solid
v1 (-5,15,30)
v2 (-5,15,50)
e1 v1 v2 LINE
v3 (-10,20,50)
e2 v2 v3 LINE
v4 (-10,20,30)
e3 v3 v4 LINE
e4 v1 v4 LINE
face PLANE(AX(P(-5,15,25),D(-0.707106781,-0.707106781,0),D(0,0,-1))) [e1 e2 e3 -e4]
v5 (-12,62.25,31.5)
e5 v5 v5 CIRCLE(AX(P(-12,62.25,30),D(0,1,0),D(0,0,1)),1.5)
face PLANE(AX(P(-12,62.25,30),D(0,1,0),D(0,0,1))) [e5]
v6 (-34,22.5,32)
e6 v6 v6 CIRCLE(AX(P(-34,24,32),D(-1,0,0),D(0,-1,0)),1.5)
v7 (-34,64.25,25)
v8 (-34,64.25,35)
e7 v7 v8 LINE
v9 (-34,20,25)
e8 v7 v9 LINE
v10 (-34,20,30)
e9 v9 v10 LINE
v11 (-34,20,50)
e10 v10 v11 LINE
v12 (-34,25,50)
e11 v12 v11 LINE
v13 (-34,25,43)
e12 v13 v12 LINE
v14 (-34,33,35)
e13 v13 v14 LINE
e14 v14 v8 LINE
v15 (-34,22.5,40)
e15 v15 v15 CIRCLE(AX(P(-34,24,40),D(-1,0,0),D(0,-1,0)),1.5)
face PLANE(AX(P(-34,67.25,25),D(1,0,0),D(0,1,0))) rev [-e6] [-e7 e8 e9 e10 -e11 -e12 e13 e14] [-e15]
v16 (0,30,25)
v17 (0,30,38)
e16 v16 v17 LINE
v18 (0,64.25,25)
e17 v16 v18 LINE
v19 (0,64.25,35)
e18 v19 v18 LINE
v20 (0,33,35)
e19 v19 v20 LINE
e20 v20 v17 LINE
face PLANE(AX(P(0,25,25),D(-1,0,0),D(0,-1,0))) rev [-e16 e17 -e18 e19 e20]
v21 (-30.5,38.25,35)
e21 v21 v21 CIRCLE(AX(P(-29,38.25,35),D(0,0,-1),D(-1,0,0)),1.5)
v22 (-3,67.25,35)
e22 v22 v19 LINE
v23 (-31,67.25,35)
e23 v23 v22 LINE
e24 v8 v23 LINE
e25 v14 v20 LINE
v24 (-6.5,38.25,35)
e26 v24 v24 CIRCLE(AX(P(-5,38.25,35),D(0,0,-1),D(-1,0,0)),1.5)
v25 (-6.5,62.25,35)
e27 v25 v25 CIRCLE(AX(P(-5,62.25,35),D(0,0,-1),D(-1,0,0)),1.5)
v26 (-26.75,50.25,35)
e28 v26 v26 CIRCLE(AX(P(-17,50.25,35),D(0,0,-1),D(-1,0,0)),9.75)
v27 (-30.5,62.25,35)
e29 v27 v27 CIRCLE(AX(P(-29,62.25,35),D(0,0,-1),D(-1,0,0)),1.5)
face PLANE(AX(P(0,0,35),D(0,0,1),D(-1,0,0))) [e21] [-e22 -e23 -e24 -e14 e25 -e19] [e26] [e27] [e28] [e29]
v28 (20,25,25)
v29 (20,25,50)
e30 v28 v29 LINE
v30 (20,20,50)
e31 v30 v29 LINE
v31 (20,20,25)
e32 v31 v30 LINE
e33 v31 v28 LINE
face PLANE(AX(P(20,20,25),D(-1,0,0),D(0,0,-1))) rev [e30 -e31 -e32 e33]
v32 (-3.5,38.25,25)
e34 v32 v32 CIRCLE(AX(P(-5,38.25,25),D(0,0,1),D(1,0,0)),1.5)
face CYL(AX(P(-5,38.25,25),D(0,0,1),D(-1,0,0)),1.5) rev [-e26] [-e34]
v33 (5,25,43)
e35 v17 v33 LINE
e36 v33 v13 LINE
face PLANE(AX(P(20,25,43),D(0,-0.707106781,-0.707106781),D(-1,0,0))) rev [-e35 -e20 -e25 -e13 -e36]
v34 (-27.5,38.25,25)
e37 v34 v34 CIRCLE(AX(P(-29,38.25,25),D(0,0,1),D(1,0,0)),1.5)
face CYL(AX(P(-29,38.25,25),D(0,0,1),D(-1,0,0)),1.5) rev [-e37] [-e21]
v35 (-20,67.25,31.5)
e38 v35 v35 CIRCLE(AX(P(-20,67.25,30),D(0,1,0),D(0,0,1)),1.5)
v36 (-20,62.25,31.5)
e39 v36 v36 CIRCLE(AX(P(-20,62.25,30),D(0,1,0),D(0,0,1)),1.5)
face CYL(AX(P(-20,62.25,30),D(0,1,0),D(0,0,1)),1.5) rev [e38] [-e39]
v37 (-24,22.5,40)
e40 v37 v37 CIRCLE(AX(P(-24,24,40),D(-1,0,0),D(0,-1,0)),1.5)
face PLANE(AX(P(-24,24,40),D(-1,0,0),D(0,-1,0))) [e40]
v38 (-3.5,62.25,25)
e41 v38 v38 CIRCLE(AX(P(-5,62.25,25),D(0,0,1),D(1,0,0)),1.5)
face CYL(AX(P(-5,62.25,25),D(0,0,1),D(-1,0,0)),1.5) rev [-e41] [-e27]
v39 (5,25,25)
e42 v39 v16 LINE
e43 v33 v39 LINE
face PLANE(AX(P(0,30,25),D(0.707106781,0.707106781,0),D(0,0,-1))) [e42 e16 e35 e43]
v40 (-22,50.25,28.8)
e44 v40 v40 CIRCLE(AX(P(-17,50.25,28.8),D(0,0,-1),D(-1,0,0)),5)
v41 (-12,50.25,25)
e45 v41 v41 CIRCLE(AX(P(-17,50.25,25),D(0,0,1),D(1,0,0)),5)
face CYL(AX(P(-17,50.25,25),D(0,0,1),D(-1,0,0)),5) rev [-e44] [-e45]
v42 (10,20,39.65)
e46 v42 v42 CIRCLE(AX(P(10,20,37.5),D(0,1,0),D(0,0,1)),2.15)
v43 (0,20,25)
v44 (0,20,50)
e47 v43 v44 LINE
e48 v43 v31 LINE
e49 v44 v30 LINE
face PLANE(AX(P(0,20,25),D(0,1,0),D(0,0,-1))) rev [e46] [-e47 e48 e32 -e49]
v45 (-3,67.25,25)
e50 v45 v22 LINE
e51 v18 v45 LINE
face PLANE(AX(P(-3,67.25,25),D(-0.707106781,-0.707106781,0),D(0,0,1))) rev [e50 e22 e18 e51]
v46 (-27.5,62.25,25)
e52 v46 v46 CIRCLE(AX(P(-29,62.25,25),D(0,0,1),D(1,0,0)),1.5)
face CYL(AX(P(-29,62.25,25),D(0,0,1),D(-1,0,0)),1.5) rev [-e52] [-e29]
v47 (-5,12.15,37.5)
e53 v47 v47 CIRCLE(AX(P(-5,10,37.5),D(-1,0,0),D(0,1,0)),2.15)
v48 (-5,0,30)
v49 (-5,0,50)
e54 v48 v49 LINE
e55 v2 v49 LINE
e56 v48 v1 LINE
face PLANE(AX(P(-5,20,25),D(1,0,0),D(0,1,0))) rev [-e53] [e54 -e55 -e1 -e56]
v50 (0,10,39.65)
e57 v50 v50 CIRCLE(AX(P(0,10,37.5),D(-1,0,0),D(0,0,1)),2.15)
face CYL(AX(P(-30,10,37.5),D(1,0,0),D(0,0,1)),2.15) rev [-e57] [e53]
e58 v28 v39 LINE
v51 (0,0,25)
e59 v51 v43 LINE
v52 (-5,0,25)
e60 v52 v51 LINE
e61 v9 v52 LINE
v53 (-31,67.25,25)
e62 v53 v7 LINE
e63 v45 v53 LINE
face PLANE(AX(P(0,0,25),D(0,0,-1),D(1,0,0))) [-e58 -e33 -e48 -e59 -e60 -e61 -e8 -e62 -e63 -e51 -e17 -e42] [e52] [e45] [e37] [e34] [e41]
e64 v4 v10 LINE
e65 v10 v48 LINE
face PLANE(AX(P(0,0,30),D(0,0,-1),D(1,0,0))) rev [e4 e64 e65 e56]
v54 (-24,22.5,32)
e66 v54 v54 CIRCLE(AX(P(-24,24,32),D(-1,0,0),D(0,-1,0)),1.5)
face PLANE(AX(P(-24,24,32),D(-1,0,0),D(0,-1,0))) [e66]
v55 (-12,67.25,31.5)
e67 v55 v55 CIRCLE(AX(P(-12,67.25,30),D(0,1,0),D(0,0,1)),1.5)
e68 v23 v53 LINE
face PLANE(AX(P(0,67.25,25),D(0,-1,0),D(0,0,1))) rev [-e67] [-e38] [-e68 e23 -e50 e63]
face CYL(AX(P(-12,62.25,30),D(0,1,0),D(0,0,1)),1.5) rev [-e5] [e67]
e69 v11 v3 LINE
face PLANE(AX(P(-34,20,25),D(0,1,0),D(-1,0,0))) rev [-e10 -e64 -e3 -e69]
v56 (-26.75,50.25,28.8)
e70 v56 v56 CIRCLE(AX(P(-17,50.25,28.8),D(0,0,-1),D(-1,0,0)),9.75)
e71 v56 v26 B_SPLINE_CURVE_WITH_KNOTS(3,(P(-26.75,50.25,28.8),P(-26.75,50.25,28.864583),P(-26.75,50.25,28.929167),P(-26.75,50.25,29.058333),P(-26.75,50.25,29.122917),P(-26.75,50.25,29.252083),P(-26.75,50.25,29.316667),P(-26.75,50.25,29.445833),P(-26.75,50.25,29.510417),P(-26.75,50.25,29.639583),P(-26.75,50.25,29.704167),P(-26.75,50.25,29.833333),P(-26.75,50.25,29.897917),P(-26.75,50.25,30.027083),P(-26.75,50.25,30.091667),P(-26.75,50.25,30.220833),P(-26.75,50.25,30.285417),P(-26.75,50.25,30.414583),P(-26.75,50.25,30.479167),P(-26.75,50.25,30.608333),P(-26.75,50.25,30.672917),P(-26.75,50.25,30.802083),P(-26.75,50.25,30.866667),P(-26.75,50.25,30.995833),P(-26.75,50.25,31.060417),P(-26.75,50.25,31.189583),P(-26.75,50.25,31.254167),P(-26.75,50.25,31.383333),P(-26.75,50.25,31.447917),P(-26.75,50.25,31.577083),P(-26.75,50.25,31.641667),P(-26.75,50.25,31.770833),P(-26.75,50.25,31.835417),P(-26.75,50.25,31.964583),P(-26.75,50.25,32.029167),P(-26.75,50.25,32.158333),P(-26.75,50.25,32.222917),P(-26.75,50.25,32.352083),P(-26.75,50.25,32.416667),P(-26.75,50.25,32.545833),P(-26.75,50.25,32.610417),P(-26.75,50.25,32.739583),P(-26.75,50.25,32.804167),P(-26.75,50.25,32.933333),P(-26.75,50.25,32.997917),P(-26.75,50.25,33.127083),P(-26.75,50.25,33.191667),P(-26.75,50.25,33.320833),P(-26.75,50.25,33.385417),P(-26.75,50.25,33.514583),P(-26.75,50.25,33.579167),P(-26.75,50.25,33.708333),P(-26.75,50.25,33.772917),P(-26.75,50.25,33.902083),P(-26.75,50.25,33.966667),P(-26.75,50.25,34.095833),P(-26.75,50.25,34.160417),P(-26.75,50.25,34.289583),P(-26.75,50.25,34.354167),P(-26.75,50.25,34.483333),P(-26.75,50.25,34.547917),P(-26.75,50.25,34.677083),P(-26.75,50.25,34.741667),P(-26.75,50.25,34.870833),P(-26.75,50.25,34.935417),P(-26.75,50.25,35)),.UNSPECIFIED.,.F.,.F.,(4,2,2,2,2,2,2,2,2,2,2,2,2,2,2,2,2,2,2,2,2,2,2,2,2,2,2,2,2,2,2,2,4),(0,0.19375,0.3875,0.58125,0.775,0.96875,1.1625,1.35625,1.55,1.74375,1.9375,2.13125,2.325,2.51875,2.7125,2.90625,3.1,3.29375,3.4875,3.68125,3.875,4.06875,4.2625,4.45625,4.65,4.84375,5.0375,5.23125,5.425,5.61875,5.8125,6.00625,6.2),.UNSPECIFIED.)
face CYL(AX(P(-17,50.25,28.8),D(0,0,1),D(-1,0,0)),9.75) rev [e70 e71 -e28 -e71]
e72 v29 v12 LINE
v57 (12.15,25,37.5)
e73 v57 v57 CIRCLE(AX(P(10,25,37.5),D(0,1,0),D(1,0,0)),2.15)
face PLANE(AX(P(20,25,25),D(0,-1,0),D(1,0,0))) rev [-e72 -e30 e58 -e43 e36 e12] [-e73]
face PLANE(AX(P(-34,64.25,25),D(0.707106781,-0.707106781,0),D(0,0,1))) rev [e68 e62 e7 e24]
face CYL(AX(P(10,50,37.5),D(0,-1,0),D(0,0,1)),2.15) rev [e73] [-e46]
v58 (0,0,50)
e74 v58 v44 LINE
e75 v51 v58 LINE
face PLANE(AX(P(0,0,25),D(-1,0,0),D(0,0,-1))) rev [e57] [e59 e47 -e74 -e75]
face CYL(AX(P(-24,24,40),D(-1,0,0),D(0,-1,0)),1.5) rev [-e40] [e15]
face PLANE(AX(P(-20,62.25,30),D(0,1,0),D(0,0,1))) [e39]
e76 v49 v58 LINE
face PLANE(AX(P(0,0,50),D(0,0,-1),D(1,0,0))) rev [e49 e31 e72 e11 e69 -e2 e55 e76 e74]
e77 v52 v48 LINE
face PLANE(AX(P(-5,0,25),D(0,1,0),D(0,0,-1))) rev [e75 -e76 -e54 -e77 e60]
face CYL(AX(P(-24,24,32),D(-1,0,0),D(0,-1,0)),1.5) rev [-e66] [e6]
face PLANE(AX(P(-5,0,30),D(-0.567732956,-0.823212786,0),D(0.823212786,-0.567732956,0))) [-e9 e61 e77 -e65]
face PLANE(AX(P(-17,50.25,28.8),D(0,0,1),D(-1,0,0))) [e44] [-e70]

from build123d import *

# Parameters (mm, degrees)
SKETCH_1_R          = 5
SKETCH_1_R_2        = 1.5
EXTRUDE_1_DEPTH     = 25
SKETCH_2_R          = 2.15
CUT_EXTRUDE_1_DEPTH = 30
SKETCH_3_R          = 2.15
CUT_EXTRUDE_2_DEPTH = 30
SKETCH_4_W          = 34
SKETCH_4_H          = 42.25
CUT_EXTRUDE_3_DEPTH = 15
CHAMFER_1_SIZE      = 5
CHAMFER_2_SIZE      = 3
SKETCH_6_R          = 9.75
CUT_EXTRUDE_5_DEPTH = 6.2
EXTRUDE_2_DEPTH     = 5
SKETCH_8_W          = 91.561993536
SKETCH_8_H          = 85.949306993
CUT_EXTRUDE_6_DEPTH = 25
CHAMFER_3_SIZE      = 8
SKETCH_9_R          = 1.5
CUT_EXTRUDE_7_DEPTH = 10
SKETCH_10_R         = 1.5
CUT_EXTRUDE_8_DEPTH = 5


with BuildPart() as part:
    # 草图1 → 凸台-拉伸1 (new body)
    with BuildSketch(Plane.XY):
        Polygon((0, 0), (0, 20), (20, 20), (20, 25), (0, 25), (0, 67.25), (-34, 67.25), (-34, 20), (-5, 20), (-5, 0), align=None)
        with Locations((-17, 50.25)):
            Circle(SKETCH_1_R, mode=Mode.SUBTRACT)
        with Locations((-29, 62.25)):
            Circle(SKETCH_1_R_2, mode=Mode.SUBTRACT)
        with Locations((-5, 62.25)):
            Circle(SKETCH_1_R_2, mode=Mode.SUBTRACT)
        with Locations((-29, 38.25)):
            Circle(SKETCH_1_R_2, mode=Mode.SUBTRACT)
        with Locations((-5, 38.25)):
            Circle(SKETCH_1_R_2, mode=Mode.SUBTRACT)
    extrude(amount=EXTRUDE_1_DEPTH)

    # 草图2 → 切除-拉伸1 (cut)
    with BuildSketch(Plane(origin=(0, 0, 0), x_dir=(0, 0, -1), z_dir=(1, 0, 0))):
        with Locations((-12.5, 10)):
            Circle(SKETCH_2_R)
    extrude(amount=-CUT_EXTRUDE_1_DEPTH, mode=Mode.SUBTRACT)

    # 草图3 → 切除-拉伸2 (cut)
    with BuildSketch(Plane.XZ.offset(-20)):
        with Locations(Location((10, 12.5, 0), (0, 0, 270))):
            Circle(SKETCH_3_R)
    extrude(amount=-CUT_EXTRUDE_2_DEPTH, mode=Mode.SUBTRACT)

    # 草图4 → 切除-拉伸3 (cut)
    with BuildSketch(Plane(origin=(0, 0, 0), x_dir=(-1, 0, 0), z_dir=(0, 0, -1))):
        with Locations((17, 46.125)):
            Rectangle(SKETCH_4_W, SKETCH_4_H)
    extrude(amount=-CUT_EXTRUDE_3_DEPTH, mode=Mode.SUBTRACT)

    # 倒角1
    chamfer_1_edges = [part.edges().sort_by_distance(p)[0] for p in [
        (-5, 20, 12.5),
        (0, 25, 20),
    ]]
    chamfer(chamfer_1_edges, length=CHAMFER_1_SIZE)

    # 倒角2
    chamfer_2_edges = [part.edges().sort_by_distance(p)[0] for p in [
        (-34, 67.25, 20),
        (0, 67.25, 20),
    ]]
    chamfer(chamfer_2_edges, length=CHAMFER_2_SIZE)

    # 草图6 → 切除-拉伸5 (cut)
    with BuildSketch(Plane(origin=(0, 0, 15), x_dir=(-1, 0, 0), z_dir=(0, 0, -1))):
        with Locations((17, 50.25)):
            Circle(SKETCH_6_R)
    extrude(amount=-CUT_EXTRUDE_5_DEPTH, mode=Mode.SUBTRACT)

    # 草图7 → 凸台-拉伸2 (add)
    with BuildSketch(Plane.XY.offset(25)):
        Polygon((-34, 20), (-10, 20), (-5, 15), (-5, 0), align=None)
    extrude(amount=-EXTRUDE_2_DEPTH)


with BuildPart() as body_2:
    # 镜向1: mirrored copy
    add(part.part.mirror(Plane.XY.offset(25)))

    # 倒角3
    # the kernel refuses this chamfer: 8 mm, written as the material it adds along each edge
    with BuildSketch(Plane(origin=(-34, 25, 35), x_dir=(0, 0.9996219169112968, -0.027495876610586487), z_dir=(1, 0, 0))) as chamfer_3_piece_1_section:
        Polygon((CHAMFER_3_SIZE * 0.999621916911, CHAMFER_3_SIZE * 0.0274958766106), (-CHAMFER_3_SIZE * 0.0274958766106, CHAMFER_3_SIZE * 0.999621916911), (0, 0), align=None)
    chamfer_3_piece_1 = extrude(amount=59.573463904, mode=Mode.PRIVATE)
    chamfer_3_piece_1 = split(chamfer_3_piece_1, bisect_by=Plane(origin=(0, 27.617876763, 37.64907513), z_dir=(-1, 0, 0)), keep=Keep.TOP, mode=Mode.PRIVATE)
    chamfer_3_piece_1 = split(chamfer_3_piece_1, bisect_by=Plane(origin=(-7.349818702, 37.349818702, 37.64907513), z_dir=(-0.7071067811865476, -0.7071067811865476, 0)), keep=Keep.TOP, mode=Mode.PRIVATE)
    add(chamfer_3_piece_1)
    with BuildSketch(Plane(origin=(-34, 25, 35), x_dir=(0, 0.9996219169112968, -0.027495876610586487), z_dir=(1, 0, 0))) as chamfer_3_piece_2_section:
        Polygon((CHAMFER_3_SIZE * 0.999621916911, CHAMFER_3_SIZE * 0.0274958766106), (-CHAMFER_3_SIZE * 0.0274958766106, CHAMFER_3_SIZE * 0.999621916911), (0, 0), align=None)
    chamfer_3_piece_2 = extrude(amount=59.573463904, mode=Mode.PRIVATE)
    chamfer_3_piece_2 = split(chamfer_3_piece_2, bisect_by=Plane(origin=(0, 26.307184644, 38.352912701), z_dir=(1, 0, 0)), keep=Keep.TOP, mode=Mode.PRIVATE)
    chamfer_3_piece_2 = split(chamfer_3_piece_2, bisect_by=Plane(origin=(2.769611517, 27.230388483, 38.352912701), z_dir=(-0.7071067811865476, -0.7071067811865476, 0)), keep=Keep.TOP, mode=Mode.PRIVATE)
    add(chamfer_3_piece_2)
    with BuildSketch(Plane(origin=(-34, 25, 35), x_dir=(0, 0.9996219169112968, -0.027495876610586487), z_dir=(1, 0, 0))) as chamfer_3_piece_3_section:
        Polygon((CHAMFER_3_SIZE * 0.999621916911, CHAMFER_3_SIZE * 0.0274958766106), (-CHAMFER_3_SIZE * 0.0274958766106, CHAMFER_3_SIZE * 0.999621916911), (0, 0), align=None)
    chamfer_3_piece_3 = extrude(amount=59.573463904, mode=Mode.PRIVATE)
    chamfer_3_piece_3 = split(chamfer_3_piece_3, bisect_by=Plane(origin=(0, 31.684169789, 35.518604569), z_dir=(-1, 0, 0)), keep=Keep.TOP, mode=Mode.PRIVATE)
    chamfer_3_piece_3 = split(chamfer_3_piece_3, bisect_by=Plane(origin=(-1.263127342, 31.263127342, 35.518604569), z_dir=(0.7071067811865476, 0.7071067811865476, 0)), keep=Keep.TOP, mode=Mode.PRIVATE)
    add(chamfer_3_piece_3)

    # 草图9 → 切除-拉伸7 (cut)
    with BuildSketch(Plane.ZY.offset(34)):
        with Locations(Location((40, 24, 0), (0, 0, 270))):
            Circle(SKETCH_9_R)
        with Locations(Location((32, 24, 0), (0, 0, 270))):
            Circle(SKETCH_9_R)
    extrude(amount=-CUT_EXTRUDE_7_DEPTH, mode=Mode.SUBTRACT)

    # 草图10 → 切除-拉伸8 (cut)
    with BuildSketch(Plane(origin=(0, 67.25, 0), x_dir=(1, 0, 0), z_dir=(0, 1, 0))):
        with Locations(Location((-12, -30, 0), (0, 0, 270))):
            Circle(SKETCH_10_R)
        with Locations(Location((-20, -30, 0), (0, 0, 270))):
            Circle(SKETCH_10_R)
    extrude(amount=-CUT_EXTRUDE_8_DEPTH, mode=Mode.SUBTRACT)


with BuildPart() as part_1:
    add(part.part)

    # 草图8 → 切除-拉伸6 (cut)
    with BuildSketch(Plane(origin=(0, 0, 0), x_dir=(-1, 0, 0), z_dir=(0, 0, -1))):
        with Locations((16.502686865, 35.124779943)):
            Rectangle(SKETCH_8_W, SKETCH_8_H)
    extrude(amount=-CUT_EXTRUDE_6_DEPTH, mode=Mode.SUBTRACT)


solid = body_2.part
